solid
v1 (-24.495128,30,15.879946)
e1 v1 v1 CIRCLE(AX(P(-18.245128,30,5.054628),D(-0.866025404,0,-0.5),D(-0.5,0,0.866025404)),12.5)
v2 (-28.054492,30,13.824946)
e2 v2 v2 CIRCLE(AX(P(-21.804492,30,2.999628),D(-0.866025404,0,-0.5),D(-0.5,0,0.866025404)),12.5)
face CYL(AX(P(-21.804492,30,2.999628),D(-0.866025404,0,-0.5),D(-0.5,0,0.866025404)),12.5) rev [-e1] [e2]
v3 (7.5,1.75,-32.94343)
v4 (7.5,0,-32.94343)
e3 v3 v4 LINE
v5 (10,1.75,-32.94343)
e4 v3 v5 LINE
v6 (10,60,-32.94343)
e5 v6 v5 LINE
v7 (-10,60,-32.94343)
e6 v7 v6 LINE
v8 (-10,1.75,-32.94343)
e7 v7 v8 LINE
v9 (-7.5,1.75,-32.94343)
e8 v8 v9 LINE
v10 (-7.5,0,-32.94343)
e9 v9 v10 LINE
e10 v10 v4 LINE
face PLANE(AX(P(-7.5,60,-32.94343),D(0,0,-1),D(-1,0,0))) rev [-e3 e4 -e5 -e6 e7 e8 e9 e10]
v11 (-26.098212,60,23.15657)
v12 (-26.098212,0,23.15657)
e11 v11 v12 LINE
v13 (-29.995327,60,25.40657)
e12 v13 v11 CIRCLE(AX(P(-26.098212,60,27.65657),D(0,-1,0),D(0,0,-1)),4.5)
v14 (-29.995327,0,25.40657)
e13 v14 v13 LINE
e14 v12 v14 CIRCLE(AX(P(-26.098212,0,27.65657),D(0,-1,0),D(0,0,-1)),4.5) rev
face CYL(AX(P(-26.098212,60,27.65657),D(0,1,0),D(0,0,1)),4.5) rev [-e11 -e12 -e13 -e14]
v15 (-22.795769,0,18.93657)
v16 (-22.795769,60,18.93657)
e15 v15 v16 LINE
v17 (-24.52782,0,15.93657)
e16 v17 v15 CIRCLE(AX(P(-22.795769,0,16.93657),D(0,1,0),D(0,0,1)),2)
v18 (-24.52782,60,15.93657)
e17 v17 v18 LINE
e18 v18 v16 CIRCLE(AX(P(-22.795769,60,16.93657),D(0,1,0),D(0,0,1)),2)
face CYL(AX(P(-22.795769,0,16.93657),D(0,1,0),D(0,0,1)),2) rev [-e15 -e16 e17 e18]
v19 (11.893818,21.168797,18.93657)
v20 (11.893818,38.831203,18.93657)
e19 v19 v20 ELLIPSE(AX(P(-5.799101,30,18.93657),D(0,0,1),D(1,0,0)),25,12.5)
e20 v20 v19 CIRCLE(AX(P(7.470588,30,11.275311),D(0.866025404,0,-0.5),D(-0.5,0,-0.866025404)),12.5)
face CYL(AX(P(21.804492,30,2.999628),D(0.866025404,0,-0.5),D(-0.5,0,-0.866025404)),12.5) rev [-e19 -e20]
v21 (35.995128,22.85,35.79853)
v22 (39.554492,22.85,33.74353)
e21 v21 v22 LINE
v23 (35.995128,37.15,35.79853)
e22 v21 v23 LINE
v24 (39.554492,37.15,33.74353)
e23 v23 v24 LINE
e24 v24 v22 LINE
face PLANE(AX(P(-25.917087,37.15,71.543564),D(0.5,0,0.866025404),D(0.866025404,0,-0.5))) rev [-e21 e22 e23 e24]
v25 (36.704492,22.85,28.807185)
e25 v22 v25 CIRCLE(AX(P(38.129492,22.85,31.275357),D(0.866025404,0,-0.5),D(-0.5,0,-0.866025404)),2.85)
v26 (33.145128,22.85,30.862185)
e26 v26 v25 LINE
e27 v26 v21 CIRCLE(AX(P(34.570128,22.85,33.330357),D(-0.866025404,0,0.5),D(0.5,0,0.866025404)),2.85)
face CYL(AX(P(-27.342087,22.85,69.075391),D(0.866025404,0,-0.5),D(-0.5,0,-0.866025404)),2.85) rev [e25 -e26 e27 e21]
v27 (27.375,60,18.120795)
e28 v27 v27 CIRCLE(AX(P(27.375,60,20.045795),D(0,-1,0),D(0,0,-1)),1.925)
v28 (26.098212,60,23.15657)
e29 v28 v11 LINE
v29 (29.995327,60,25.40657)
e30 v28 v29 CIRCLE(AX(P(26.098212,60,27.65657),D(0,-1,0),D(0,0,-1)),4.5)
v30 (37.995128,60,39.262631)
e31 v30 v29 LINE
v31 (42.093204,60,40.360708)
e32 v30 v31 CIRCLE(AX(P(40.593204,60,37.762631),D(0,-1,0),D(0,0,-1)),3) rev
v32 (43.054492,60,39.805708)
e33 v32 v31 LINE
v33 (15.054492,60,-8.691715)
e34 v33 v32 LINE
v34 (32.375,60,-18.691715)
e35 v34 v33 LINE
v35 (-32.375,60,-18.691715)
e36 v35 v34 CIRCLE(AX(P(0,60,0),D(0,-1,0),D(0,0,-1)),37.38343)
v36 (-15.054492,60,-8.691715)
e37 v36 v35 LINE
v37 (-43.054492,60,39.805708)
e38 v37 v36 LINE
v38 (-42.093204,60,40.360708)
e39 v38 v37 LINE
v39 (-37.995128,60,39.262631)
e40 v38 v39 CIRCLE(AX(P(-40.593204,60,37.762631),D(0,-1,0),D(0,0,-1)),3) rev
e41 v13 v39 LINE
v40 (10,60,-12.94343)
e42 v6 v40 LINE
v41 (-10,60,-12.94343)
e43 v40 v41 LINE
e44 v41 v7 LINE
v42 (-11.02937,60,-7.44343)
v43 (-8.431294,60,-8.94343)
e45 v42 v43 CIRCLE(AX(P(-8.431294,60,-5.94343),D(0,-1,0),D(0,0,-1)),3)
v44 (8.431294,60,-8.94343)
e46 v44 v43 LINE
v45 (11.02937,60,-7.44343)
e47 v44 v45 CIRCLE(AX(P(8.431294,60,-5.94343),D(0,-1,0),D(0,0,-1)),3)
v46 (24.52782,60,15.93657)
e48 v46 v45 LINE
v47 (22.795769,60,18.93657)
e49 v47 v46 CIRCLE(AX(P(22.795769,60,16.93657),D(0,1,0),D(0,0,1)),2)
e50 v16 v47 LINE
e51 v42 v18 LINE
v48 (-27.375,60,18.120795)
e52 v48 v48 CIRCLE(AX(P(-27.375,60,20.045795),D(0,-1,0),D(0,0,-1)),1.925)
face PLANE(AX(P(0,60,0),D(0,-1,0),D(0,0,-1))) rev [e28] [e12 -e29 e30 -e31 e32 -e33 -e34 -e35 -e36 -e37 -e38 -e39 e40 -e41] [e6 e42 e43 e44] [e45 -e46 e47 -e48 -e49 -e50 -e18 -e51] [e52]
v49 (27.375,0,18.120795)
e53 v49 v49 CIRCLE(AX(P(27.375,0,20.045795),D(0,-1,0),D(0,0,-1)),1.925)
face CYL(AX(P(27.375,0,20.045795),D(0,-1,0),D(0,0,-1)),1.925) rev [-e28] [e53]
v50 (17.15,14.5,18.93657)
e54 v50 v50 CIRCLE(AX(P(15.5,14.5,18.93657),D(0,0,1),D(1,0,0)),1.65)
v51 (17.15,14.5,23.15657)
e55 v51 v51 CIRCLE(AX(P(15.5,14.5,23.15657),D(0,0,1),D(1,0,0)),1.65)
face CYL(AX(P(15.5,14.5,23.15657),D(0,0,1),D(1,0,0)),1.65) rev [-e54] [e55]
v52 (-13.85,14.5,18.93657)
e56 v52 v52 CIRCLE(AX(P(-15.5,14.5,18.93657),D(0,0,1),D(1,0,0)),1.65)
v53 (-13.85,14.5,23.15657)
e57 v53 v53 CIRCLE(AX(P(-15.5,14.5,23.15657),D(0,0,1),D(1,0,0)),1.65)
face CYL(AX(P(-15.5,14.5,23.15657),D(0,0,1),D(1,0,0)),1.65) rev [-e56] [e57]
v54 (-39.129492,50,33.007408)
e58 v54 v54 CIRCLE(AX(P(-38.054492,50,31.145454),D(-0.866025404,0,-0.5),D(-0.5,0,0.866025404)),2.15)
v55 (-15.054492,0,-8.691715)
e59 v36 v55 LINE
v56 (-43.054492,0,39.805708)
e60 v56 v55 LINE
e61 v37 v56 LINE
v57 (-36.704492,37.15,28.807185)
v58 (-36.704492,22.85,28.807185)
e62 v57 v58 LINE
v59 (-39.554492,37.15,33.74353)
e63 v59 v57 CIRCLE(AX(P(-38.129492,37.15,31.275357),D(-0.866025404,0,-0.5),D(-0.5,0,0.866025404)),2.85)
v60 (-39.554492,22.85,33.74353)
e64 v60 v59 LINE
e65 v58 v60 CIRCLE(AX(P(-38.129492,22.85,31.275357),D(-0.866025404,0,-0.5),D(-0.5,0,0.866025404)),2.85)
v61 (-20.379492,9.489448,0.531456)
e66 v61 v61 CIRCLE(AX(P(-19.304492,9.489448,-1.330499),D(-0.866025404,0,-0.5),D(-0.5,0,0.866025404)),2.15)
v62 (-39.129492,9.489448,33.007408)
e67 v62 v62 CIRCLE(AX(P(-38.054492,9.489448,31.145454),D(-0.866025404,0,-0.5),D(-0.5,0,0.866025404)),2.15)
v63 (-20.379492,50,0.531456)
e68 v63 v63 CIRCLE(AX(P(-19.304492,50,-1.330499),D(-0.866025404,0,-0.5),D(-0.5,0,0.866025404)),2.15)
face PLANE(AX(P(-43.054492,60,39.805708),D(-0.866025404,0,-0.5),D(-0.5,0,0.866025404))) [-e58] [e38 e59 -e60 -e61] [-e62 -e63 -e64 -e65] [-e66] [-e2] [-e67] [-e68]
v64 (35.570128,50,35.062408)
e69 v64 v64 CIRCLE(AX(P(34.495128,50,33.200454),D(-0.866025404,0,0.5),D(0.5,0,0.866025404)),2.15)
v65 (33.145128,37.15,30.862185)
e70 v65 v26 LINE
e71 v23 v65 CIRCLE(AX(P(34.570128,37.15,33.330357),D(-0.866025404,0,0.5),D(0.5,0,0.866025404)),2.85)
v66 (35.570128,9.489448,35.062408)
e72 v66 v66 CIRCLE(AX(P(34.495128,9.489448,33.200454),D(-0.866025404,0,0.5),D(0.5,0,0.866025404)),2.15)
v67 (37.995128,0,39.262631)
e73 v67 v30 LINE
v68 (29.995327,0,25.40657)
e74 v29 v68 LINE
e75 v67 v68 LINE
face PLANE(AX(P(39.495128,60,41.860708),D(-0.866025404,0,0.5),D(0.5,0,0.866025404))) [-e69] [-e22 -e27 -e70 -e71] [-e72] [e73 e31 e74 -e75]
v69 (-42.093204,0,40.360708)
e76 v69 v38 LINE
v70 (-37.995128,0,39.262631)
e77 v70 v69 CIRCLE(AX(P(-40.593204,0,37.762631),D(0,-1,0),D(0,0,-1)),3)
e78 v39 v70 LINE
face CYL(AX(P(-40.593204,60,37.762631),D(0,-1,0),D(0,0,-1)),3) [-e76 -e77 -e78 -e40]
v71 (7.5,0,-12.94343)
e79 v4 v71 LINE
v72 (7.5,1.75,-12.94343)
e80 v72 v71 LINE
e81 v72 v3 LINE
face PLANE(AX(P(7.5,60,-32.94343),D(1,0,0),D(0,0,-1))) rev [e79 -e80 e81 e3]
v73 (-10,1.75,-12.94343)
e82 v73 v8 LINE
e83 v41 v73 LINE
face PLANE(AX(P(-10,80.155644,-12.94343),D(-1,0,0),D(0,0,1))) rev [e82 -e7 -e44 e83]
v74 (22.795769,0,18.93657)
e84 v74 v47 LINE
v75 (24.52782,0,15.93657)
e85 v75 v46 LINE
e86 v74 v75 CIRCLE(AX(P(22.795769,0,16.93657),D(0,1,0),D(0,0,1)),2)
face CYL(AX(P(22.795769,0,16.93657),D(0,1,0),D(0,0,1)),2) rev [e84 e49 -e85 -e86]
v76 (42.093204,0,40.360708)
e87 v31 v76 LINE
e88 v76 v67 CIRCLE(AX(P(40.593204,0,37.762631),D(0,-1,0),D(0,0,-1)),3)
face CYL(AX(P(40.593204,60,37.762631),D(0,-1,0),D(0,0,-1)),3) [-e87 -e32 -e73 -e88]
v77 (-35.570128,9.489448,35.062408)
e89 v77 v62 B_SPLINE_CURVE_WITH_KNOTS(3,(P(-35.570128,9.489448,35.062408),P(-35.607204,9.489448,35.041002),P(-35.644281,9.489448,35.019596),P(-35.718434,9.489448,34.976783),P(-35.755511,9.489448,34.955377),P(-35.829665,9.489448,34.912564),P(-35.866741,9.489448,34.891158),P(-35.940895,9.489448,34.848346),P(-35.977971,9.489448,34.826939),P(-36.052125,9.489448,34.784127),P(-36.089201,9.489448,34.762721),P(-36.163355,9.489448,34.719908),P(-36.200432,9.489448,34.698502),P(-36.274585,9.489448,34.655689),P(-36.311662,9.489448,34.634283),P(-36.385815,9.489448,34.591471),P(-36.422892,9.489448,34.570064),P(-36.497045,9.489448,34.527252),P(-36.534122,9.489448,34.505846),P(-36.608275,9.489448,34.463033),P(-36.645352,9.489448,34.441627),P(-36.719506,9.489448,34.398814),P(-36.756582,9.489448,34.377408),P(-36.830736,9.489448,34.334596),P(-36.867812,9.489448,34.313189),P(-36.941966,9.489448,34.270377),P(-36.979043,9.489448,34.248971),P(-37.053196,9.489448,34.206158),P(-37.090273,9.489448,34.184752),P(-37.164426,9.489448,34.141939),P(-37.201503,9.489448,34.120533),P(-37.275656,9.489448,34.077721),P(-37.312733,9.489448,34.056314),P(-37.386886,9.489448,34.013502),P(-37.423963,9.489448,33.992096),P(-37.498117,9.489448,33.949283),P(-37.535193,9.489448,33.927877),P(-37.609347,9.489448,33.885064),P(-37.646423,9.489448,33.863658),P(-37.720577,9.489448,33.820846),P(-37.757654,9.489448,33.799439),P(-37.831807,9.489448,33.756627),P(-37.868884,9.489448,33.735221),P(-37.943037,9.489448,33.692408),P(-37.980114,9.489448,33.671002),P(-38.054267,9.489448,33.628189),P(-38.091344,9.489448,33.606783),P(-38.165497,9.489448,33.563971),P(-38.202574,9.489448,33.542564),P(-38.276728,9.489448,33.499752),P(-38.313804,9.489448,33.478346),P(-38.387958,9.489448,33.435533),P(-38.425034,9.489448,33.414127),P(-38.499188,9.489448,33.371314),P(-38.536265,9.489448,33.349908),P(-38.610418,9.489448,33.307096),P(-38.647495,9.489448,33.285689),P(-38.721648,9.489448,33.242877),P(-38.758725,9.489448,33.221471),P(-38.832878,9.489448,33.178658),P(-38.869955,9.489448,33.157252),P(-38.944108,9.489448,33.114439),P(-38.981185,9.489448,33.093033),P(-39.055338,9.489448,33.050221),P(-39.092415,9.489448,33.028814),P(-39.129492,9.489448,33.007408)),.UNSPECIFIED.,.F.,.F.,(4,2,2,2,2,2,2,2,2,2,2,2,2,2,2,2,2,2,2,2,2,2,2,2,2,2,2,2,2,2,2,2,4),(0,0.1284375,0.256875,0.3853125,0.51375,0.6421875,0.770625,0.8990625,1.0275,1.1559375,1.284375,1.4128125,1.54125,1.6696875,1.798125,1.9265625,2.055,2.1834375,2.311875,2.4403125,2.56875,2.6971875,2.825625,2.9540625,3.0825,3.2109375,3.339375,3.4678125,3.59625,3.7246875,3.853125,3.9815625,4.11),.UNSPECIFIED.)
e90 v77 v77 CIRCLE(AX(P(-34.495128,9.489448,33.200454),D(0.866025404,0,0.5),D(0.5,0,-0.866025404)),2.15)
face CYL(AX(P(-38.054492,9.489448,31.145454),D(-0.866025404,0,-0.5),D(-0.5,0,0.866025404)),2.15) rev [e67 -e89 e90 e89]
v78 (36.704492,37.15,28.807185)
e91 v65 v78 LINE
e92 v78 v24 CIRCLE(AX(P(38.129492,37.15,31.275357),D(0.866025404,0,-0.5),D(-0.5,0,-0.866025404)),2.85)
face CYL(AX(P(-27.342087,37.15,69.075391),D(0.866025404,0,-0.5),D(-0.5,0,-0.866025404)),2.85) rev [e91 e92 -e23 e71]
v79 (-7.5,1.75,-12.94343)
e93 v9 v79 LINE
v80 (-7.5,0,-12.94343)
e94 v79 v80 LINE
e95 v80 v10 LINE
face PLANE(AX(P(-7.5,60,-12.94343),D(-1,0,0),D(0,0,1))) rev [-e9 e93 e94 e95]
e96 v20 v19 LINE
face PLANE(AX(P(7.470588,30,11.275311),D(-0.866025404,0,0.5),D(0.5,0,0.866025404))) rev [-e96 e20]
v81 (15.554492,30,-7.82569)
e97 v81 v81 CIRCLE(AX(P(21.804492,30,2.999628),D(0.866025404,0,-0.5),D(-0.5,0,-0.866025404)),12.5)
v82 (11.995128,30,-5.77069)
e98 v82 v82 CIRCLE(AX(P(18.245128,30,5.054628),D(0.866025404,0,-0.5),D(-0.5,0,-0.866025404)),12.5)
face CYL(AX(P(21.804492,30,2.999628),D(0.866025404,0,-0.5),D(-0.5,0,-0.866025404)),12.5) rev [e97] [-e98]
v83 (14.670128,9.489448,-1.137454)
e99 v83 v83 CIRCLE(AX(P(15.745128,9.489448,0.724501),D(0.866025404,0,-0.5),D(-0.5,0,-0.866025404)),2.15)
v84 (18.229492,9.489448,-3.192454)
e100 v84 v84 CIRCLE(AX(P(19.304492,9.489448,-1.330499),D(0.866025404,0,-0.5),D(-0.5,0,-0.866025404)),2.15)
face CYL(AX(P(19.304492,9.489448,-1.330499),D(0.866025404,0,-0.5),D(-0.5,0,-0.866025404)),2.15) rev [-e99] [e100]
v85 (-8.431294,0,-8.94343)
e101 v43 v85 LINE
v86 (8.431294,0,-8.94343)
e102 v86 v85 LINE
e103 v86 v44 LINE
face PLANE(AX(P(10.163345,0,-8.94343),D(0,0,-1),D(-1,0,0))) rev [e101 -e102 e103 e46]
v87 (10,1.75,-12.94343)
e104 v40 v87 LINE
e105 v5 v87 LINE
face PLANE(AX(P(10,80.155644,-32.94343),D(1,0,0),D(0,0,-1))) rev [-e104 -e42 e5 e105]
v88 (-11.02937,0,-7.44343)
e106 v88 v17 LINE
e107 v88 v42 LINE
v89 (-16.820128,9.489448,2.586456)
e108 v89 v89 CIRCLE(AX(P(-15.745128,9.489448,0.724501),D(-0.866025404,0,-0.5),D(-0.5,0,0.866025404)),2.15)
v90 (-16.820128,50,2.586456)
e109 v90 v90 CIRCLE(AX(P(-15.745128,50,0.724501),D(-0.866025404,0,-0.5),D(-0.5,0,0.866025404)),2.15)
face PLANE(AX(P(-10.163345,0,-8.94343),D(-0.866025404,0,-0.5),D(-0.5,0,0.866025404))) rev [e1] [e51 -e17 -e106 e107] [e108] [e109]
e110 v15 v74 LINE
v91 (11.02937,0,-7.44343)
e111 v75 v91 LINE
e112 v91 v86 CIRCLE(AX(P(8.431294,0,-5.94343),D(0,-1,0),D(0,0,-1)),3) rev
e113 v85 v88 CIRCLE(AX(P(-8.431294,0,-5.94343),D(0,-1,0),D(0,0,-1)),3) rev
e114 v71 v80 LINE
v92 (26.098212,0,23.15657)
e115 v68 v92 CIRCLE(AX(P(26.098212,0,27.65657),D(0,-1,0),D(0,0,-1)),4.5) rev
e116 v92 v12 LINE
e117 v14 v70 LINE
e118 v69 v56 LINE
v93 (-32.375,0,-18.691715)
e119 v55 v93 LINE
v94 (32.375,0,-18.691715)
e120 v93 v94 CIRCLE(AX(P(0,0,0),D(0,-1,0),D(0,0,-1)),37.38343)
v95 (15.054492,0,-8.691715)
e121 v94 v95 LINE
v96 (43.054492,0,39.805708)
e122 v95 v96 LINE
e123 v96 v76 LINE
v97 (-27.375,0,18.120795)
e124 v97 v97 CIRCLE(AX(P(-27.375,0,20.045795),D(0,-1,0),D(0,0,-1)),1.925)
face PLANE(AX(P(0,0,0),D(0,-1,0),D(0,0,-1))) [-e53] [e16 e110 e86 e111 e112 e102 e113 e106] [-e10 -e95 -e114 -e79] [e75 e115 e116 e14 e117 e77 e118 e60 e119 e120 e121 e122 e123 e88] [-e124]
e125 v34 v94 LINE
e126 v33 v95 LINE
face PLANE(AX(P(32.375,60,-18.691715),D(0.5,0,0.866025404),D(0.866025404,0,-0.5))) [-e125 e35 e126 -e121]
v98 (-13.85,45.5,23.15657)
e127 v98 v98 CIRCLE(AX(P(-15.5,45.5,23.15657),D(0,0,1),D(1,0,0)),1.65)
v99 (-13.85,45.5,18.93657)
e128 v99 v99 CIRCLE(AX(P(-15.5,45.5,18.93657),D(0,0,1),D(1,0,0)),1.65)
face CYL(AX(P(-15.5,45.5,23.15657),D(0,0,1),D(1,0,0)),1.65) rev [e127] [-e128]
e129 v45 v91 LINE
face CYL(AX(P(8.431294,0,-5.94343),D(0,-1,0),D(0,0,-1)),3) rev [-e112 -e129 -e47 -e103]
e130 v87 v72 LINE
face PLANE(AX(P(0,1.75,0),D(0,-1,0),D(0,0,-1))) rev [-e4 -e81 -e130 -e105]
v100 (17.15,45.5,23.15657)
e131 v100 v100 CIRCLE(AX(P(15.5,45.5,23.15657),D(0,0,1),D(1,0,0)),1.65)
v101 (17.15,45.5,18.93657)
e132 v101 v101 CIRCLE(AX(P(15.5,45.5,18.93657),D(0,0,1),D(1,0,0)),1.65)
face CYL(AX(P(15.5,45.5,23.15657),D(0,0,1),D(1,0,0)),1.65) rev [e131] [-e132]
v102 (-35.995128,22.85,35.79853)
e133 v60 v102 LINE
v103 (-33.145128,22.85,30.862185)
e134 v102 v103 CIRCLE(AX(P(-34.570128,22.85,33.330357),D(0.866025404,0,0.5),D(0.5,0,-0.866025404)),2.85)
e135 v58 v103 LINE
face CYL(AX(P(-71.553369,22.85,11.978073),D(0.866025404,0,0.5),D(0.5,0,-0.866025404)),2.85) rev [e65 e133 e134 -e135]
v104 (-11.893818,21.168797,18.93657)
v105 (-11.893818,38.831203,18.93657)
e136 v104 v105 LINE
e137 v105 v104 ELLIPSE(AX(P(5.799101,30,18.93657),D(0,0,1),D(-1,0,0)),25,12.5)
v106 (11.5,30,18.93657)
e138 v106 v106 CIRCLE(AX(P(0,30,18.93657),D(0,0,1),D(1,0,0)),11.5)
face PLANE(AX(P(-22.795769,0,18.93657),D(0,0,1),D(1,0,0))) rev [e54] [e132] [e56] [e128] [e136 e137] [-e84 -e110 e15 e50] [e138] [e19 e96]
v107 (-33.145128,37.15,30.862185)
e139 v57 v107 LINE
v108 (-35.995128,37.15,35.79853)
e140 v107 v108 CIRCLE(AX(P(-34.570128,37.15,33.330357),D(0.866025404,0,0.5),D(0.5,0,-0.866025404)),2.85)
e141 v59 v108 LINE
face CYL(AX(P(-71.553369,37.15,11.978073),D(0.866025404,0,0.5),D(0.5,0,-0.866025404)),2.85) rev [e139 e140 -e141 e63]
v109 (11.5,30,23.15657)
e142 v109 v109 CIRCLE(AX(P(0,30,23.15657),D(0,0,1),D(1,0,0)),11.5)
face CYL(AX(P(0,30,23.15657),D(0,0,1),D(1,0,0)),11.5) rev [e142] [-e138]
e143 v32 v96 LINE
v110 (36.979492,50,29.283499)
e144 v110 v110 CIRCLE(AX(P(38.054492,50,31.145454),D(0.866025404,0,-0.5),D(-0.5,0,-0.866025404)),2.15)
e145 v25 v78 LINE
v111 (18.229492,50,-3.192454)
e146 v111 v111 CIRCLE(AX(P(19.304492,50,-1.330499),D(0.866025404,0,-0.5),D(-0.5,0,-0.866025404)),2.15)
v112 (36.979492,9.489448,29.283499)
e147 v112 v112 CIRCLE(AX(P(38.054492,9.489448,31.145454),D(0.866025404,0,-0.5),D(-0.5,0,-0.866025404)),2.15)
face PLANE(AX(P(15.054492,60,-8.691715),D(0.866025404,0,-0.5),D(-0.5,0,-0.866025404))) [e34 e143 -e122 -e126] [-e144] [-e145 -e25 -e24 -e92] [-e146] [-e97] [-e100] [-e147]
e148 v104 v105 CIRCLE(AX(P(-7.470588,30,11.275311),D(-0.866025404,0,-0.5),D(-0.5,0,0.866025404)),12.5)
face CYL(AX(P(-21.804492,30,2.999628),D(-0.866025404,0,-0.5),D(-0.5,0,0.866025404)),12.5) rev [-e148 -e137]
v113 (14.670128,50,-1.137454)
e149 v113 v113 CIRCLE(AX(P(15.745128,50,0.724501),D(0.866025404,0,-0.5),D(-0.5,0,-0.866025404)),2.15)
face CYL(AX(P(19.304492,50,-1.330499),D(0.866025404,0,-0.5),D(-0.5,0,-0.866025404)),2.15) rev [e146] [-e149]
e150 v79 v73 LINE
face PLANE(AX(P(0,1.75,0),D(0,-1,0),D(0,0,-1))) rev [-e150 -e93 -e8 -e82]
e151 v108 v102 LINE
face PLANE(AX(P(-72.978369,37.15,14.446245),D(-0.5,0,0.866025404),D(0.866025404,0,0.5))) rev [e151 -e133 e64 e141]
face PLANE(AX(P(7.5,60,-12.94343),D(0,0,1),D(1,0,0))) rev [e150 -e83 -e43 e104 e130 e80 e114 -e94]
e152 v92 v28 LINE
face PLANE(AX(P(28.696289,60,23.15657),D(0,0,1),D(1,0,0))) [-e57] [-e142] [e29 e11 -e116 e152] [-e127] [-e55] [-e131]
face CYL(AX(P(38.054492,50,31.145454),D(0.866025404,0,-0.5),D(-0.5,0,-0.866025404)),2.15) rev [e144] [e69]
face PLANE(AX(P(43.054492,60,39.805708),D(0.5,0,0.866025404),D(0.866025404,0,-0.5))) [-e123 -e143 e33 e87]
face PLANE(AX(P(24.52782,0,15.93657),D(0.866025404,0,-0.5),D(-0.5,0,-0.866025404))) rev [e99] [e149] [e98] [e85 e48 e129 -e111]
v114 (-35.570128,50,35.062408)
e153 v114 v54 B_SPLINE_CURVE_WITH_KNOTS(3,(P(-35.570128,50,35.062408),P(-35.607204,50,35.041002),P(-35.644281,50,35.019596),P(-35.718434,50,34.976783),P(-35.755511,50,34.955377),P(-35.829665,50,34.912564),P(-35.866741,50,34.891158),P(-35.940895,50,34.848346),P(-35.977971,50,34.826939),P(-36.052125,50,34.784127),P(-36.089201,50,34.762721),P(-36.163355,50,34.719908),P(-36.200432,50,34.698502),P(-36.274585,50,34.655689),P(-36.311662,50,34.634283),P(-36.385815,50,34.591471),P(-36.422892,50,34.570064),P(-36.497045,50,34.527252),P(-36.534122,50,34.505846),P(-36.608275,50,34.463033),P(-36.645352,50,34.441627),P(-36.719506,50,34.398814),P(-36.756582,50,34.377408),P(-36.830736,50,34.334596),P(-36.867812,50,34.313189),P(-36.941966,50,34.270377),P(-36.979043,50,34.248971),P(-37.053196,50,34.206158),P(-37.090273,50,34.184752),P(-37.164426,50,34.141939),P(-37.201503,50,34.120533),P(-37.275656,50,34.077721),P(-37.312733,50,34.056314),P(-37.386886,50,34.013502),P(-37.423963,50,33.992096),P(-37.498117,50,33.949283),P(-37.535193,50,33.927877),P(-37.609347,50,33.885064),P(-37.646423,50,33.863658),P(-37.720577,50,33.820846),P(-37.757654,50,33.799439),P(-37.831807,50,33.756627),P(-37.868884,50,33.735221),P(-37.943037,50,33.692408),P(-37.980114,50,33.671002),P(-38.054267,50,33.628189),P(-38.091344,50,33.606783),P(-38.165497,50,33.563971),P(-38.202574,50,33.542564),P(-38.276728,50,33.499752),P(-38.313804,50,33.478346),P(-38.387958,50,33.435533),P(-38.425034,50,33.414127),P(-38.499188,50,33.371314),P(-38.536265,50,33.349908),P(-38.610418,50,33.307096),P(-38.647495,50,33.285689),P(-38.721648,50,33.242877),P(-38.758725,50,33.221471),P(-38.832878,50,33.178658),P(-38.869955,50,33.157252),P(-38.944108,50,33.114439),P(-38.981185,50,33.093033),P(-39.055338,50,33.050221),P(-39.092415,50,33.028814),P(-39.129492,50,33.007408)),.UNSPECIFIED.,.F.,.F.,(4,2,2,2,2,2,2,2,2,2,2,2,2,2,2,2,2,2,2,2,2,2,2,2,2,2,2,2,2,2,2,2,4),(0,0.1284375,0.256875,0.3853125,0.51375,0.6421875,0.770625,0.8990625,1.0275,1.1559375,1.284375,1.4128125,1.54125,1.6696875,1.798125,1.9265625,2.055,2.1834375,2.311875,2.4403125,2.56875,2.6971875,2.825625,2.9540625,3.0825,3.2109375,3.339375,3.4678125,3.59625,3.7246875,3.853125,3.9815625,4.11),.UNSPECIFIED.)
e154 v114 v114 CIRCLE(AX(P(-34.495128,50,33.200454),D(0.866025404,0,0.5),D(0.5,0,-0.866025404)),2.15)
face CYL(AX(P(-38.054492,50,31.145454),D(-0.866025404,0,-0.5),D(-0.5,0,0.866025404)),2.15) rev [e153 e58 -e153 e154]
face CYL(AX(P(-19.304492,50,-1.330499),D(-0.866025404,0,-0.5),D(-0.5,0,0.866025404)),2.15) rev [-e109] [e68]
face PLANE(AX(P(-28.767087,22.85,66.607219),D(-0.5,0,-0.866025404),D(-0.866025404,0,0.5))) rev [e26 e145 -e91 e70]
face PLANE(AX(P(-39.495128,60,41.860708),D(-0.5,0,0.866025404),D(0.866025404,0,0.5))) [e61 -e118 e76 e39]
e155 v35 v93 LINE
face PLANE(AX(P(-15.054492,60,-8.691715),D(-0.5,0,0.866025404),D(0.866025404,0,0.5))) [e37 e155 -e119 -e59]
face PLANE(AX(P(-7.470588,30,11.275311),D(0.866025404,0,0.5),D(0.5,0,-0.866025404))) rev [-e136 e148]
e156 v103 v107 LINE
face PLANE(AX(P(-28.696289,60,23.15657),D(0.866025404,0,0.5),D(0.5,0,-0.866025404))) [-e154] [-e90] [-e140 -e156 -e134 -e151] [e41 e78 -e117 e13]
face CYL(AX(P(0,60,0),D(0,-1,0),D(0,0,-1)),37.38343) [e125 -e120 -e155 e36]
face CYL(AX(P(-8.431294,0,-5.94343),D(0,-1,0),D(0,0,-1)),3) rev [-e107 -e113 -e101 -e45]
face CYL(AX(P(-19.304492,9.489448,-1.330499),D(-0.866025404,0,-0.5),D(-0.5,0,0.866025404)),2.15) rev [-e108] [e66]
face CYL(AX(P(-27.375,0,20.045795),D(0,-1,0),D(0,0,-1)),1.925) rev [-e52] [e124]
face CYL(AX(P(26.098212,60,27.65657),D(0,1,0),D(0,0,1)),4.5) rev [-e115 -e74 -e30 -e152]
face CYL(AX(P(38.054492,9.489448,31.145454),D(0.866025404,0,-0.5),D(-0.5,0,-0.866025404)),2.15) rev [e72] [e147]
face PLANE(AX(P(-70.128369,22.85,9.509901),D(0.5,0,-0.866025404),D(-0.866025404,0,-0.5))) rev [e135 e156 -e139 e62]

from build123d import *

# Parameters (mm, degrees)
BOSS_EXTRUDE1_DEPTH                = 60
SKETCH2_W                          = 15
SKETCH2_H                          = 20
CUT_EXTRUDE1_DEPTH                 = 85.888209544
CUT_EXTRUDE2_REACH                 = 85.66
SKETCH4_W                          = 2.5
SKETCH4_H                          = 20
CUT_EXTRUDE3_REACH                 = 85.66
SKETCH6_W                          = 2.5
SKETCH6_H                          = 20
CUT_EXTRUDE4_DEPTH                 = 98.632993582
CUT_EXTRUDE5_DEPTH                 = 95.486300493
CUT_EXTRUDE6_DEPTH                 = 85.888209544
F_4_3_4_3_DIAMETER_HOLE1_D         = 4.3
F_4_3_4_3_DIAMETER_HOLE1_DEPTH     = 75.600067507
F_4_3_4_3_DIAMETER_HOLE2_D         = 4.3
F_4_3_4_3_DIAMETER_HOLE2_DEPTH     = 75.600067507
F_4_3_4_3_DIAMETER_HOLE3_D         = 4.3
F_4_3_4_3_DIAMETER_HOLE3_DEPTH     = 4.11
F_25_0_START                       = -17.38342993
F_25_0_25_DIAMETER_HOLE1_DEPTH     = 16.551366025
F_4_3_4_3_DIAMETER_HOLE4_D         = 4.3
F_4_3_4_3_DIAMETER_HOLE4_DEPTH     = 4.11
F_25_0_START_2                     = 0.832063905
F_25_0_25_DIAMETER_HOLE2_OUTLINE_R = 12.5
F_25_0_25_DIAMETER_HOLE2_DEPTH     = 16.551366025
F_23_0_23_DIAMETER_HOLE1_D         = 23
F_23_0_23_DIAMETER_HOLE1_DEPTH     = 4.22
F_3_3_3_3_DIAMETER_HOLE1_D         = 3.3
F_3_3_3_3_DIAMETER_HOLE1_DEPTH     = 4.22
M3_5_CLEARANCE_HOLE1_D             = 3.85
FILLET1_R                          = 3
FILLET2_R                          = 4.5


# Read off the part's stored shape, not the designer's step: Ø25.0 (25) Diameter Hole1, Ø25.0 (25) Diameter Hole2
with BuildPart() as part:
    # Sketch1 → Boss-Extrude1 (new body)
    with BuildSketch(Plane.XZ):
        with BuildLine():
            Line((32.375, -18.691714965), (15.054491924, -8.691714965))
            Line((15.054491924, -8.691714965), (43.054491924, 39.805707647))
            Line((43.054491924, 39.805707647), (39.495127515, 41.860707647))
            Line((39.495127515, 41.860707647), (28.69628865, 23.15657007))
            Line((28.69628865, 23.15657007), (-28.69628865, 23.15657007))
            Line((-28.69628865, 23.15657007), (-39.495127515, 41.860707647))
            Line((-39.495127515, 41.860707647), (-43.054491924, 39.805707647))
            Line((-43.054491924, 39.805707647), (-15.054491924, -8.691714965))
            Line((-15.054491924, -8.691714965), (-32.375, -18.691714965))
            ThreePointArc((-32.375, -18.691714965), (0, -37.38342993), (32.375, -18.691714965))
        make_face()
    extrude(amount=-BOSS_EXTRUDE1_DEPTH)

    # Sketch2 → Cut-Extrude1 (cut, through all)
    with BuildSketch(Plane.XZ):
        with Locations((0, -22.94342993)):
            Rectangle(SKETCH2_W, SKETCH2_H)
    extrude(amount=-CUT_EXTRUDE1_DEPTH, mode=Mode.SUBTRACT)

    # Sketch4 → Cut-Extrude2 (cut, up to next)
    with BuildSketch(Plane.XZ.offset(-1.75), mode=Mode.PRIVATE) as cut_extrude2_sk1:
        with Locations((8.75, -22.94342993)):
            Rectangle(SKETCH4_W, SKETCH4_H)
    cut_extrude2_tool1 = extrude(cut_extrude2_sk1.sketch, amount=-CUT_EXTRUDE2_REACH, mode=Mode.PRIVATE) & part.part
    add(cut_extrude2_tool1.solids().sort_by_distance((8.75, 1.75, -22.94343))[0], mode=Mode.SUBTRACT)

    # Sketch6 → Cut-Extrude3 (cut, up to next)
    with BuildSketch(Plane.XZ.offset(-1.75), mode=Mode.PRIVATE) as cut_extrude3_sk1:
        with Locations((-8.75, -22.94342993)):
            Rectangle(SKETCH6_W, SKETCH6_H)
    cut_extrude3_tool1 = extrude(cut_extrude3_sk1.sketch, amount=-CUT_EXTRUDE3_REACH, mode=Mode.PRIVATE) & part.part
    add(cut_extrude3_tool1.solids().sort_by_distance((-8.75, 1.75, -22.94343))[0], mode=Mode.SUBTRACT)

    # Sketch7 → Cut-Extrude4 (cut, through all)
    with BuildSketch(Plane(origin=(15.054491924, 0, -8.691714965), x_dir=(-0.4999999999999995, 0, -0.866025403784439), z_dir=(0.8660254037844389, 0, -0.49999999999999944))):
        with BuildLine():
            Line((-49, 37.15), (-49, 22.85))
            ThreePointArc((-49, 22.85), (-46.15, 20), (-43.3, 22.85))
            Line((-43.3, 22.85), (-43.3, 37.15))
            ThreePointArc((-43.3, 37.15), (-46.15, 40), (-49, 37.15))
        make_face()
    extrude(amount=-CUT_EXTRUDE4_DEPTH, mode=Mode.SUBTRACT)

    # Sketch8 → Cut-Extrude5 (cut, through all)
    with BuildSketch(Plane(origin=(-11.495127515, 0, -6.636714965), x_dir=(0.5000000000000004, 0, -0.8660254037844385), z_dir=(0.8660254037844384, 0, 0.5000000000000003))):
        with BuildLine():
            Line((-49, 37.15), (-49, 22.85))
            ThreePointArc((-49, 22.85), (-46.15, 20), (-43.3, 22.85))
            Line((-43.3, 22.85), (-43.3, 37.15))
            ThreePointArc((-43.3, 37.15), (-46.15, 40), (-49, 37.15))
        make_face()
    extrude(amount=-CUT_EXTRUDE5_DEPTH, mode=Mode.SUBTRACT)

    # Sketch9 → Cut-Extrude6 (cut, through all)
    with BuildSketch(Plane(origin=(0, 60, 0), x_dir=(-1, 0, 0), z_dir=(0, 1, 0))):
        with BuildLine():
            Line((22.795768899, 18.93657007), (-22.795768899, 18.93657007))
            ThreePointArc((-22.795768899, 18.93657007), (-24.527819706, 17.93657007), (-24.527819706, 15.93657007))
            Line((-24.527819706, 15.93657007), (-10.163345009, -8.94342993))
            Line((-10.163345009, -8.94342993), (10.163345009, -8.94342993))
            Line((10.163345009, -8.94342993), (24.527819706, 15.93657007))
            ThreePointArc((24.527819706, 15.93657007), (24.527819706, 17.93657007), (22.795768899, 18.93657007))
        make_face()
    extrude(amount=-CUT_EXTRUDE6_DEPTH, mode=Mode.SUBTRACT)

    # Ø4.3 (4.3) Diameter Hole1
    with Locations(Plane(origin=(-15.054491924, 0, -8.691714965), x_dir=(-0.5000000000000003, 0, 0.8660254037844385), z_dir=(-0.8660254037844385, 0, -0.5000000000000003))):
        with Locations((46, 9.48944756), (46, 50)):
            Hole(F_4_3_4_3_DIAMETER_HOLE1_D / 2, depth=F_4_3_4_3_DIAMETER_HOLE1_DEPTH)

    # Ø4.3 (4.3) Diameter Hole2
    with Locations(Plane(origin=(15.054491924, 0, -8.691714965), x_dir=(-0.4999999999999995, 0, -0.866025403784439), z_dir=(0.8660254037844389, 0, -0.49999999999999944))):
        with Locations((-46, 9.48944756), (-46, 50)):
            Hole(F_4_3_4_3_DIAMETER_HOLE2_D / 2, depth=F_4_3_4_3_DIAMETER_HOLE2_DEPTH)

    # Ø4.3 (4.3) Diameter Hole3
    with Locations(Plane(origin=(-15.054491924, 0, -8.691714965), x_dir=(-0.5000000000000003, 0, 0.8660254037844385), z_dir=(-0.8660254037844385, 0, -0.5000000000000003))):
        with Locations((8.5, 9.48944756), (8.5, 50)):
            Hole(F_4_3_4_3_DIAMETER_HOLE3_D / 2, depth=F_4_3_4_3_DIAMETER_HOLE3_DEPTH)

    # Ø25.0 (25) Diameter Hole1 outline → Ø25.0 (25) Diameter Hole1 (cut)
    with BuildSketch(Plane(origin=(0, 0, 0), x_dir=(0.5000000000000003, 0, -0.8660254037844385), z_dir=(0.8660254037844385, 0, 0.5000000000000003)).offset(F_25_0_START)):
        with BuildLine():
            ThreePointArc((-22.346459974, 21.168797028), (-1, 30), (-22.346459974, 38.831202972))
            ThreePointArc((-22.346459974, 38.831202972), (-26, 30), (-22.346459974, 21.168797028))
        make_face()
    extrude(amount=F_25_0_25_DIAMETER_HOLE1_DEPTH, mode=Mode.SUBTRACT)

    # Ø4.3 (4.3) Diameter Hole4
    with Locations(Plane(origin=(15.054491924, 0, -8.691714965), x_dir=(-0.4999999999999995, 0, -0.866025403784439), z_dir=(0.8660254037844389, 0, -0.49999999999999944))):
        with Locations((-8.5, 9.48944756), (-8.5, 50)):
            Hole(F_4_3_4_3_DIAMETER_HOLE4_D / 2, depth=F_4_3_4_3_DIAMETER_HOLE4_DEPTH)

    # Ø25.0 (25) Diameter Hole2 outline → Ø25.0 (25) Diameter Hole2 (cut)
    with BuildSketch(Plane(origin=(0, 0, 0), x_dir=(0.49999999999999956, 0, 0.8660254037844389), z_dir=(0.8660254037844388, 0, -0.4999999999999999)).offset(F_25_0_START_2)):
        with Locations((13.5, -30)):
            Circle(F_25_0_25_DIAMETER_HOLE2_OUTLINE_R)
    extrude(amount=F_25_0_25_DIAMETER_HOLE2_DEPTH, mode=Mode.SUBTRACT)

    # Ø23.0 (23) Diameter Hole1
    with Locations(Plane.XY.offset(23.15657007)):
        with Locations((0, 30)):
            Hole(F_23_0_23_DIAMETER_HOLE1_D / 2, depth=F_23_0_23_DIAMETER_HOLE1_DEPTH)

    # Ø3.3 (3.3) Diameter Hole1
    with Locations(Plane.XY.offset(23.15657007)):
        with Locations((15.5, 45.5), (15.5, 14.5), (-15.5, 14.5), (-15.5, 45.5)):
            Hole(F_3_3_3_3_DIAMETER_HOLE1_D / 2, depth=F_3_3_3_3_DIAMETER_HOLE1_DEPTH)

    # M3.5 Clearance Hole1 (through all)
    with Locations(Plane(origin=(0, 0, 0), x_dir=(-1, 0, 0), z_dir=(0, -1, 0))):
        with Locations((-27.375, -20.045794742), (27.375, -20.045794742)):
            Hole(M3_5_CLEARANCE_HOLE1_D / 2)

    # Fillet1
    fillet1_edges = [part.edges().sort_by_distance(p)[0] for p in [
        (-10.163345009, 30, -8.94342993),
        (10.163345009, 30, -8.94342993),
        (-39.495127515, 30, 41.860707647),
        (39.495127515, 30, 41.860707647),
    ]]
    fillet(fillet1_edges, radius=FILLET1_R)

    # Fillet2
    fillet2_edges = [part.edges().sort_by_distance(p)[0] for p in [
        (-28.69628865, 30, 23.15657007),
        (28.69628865, 30, 23.15657007),
    ]]
    fillet(fillet2_edges, radius=FILLET2_R)


solid = part.part
